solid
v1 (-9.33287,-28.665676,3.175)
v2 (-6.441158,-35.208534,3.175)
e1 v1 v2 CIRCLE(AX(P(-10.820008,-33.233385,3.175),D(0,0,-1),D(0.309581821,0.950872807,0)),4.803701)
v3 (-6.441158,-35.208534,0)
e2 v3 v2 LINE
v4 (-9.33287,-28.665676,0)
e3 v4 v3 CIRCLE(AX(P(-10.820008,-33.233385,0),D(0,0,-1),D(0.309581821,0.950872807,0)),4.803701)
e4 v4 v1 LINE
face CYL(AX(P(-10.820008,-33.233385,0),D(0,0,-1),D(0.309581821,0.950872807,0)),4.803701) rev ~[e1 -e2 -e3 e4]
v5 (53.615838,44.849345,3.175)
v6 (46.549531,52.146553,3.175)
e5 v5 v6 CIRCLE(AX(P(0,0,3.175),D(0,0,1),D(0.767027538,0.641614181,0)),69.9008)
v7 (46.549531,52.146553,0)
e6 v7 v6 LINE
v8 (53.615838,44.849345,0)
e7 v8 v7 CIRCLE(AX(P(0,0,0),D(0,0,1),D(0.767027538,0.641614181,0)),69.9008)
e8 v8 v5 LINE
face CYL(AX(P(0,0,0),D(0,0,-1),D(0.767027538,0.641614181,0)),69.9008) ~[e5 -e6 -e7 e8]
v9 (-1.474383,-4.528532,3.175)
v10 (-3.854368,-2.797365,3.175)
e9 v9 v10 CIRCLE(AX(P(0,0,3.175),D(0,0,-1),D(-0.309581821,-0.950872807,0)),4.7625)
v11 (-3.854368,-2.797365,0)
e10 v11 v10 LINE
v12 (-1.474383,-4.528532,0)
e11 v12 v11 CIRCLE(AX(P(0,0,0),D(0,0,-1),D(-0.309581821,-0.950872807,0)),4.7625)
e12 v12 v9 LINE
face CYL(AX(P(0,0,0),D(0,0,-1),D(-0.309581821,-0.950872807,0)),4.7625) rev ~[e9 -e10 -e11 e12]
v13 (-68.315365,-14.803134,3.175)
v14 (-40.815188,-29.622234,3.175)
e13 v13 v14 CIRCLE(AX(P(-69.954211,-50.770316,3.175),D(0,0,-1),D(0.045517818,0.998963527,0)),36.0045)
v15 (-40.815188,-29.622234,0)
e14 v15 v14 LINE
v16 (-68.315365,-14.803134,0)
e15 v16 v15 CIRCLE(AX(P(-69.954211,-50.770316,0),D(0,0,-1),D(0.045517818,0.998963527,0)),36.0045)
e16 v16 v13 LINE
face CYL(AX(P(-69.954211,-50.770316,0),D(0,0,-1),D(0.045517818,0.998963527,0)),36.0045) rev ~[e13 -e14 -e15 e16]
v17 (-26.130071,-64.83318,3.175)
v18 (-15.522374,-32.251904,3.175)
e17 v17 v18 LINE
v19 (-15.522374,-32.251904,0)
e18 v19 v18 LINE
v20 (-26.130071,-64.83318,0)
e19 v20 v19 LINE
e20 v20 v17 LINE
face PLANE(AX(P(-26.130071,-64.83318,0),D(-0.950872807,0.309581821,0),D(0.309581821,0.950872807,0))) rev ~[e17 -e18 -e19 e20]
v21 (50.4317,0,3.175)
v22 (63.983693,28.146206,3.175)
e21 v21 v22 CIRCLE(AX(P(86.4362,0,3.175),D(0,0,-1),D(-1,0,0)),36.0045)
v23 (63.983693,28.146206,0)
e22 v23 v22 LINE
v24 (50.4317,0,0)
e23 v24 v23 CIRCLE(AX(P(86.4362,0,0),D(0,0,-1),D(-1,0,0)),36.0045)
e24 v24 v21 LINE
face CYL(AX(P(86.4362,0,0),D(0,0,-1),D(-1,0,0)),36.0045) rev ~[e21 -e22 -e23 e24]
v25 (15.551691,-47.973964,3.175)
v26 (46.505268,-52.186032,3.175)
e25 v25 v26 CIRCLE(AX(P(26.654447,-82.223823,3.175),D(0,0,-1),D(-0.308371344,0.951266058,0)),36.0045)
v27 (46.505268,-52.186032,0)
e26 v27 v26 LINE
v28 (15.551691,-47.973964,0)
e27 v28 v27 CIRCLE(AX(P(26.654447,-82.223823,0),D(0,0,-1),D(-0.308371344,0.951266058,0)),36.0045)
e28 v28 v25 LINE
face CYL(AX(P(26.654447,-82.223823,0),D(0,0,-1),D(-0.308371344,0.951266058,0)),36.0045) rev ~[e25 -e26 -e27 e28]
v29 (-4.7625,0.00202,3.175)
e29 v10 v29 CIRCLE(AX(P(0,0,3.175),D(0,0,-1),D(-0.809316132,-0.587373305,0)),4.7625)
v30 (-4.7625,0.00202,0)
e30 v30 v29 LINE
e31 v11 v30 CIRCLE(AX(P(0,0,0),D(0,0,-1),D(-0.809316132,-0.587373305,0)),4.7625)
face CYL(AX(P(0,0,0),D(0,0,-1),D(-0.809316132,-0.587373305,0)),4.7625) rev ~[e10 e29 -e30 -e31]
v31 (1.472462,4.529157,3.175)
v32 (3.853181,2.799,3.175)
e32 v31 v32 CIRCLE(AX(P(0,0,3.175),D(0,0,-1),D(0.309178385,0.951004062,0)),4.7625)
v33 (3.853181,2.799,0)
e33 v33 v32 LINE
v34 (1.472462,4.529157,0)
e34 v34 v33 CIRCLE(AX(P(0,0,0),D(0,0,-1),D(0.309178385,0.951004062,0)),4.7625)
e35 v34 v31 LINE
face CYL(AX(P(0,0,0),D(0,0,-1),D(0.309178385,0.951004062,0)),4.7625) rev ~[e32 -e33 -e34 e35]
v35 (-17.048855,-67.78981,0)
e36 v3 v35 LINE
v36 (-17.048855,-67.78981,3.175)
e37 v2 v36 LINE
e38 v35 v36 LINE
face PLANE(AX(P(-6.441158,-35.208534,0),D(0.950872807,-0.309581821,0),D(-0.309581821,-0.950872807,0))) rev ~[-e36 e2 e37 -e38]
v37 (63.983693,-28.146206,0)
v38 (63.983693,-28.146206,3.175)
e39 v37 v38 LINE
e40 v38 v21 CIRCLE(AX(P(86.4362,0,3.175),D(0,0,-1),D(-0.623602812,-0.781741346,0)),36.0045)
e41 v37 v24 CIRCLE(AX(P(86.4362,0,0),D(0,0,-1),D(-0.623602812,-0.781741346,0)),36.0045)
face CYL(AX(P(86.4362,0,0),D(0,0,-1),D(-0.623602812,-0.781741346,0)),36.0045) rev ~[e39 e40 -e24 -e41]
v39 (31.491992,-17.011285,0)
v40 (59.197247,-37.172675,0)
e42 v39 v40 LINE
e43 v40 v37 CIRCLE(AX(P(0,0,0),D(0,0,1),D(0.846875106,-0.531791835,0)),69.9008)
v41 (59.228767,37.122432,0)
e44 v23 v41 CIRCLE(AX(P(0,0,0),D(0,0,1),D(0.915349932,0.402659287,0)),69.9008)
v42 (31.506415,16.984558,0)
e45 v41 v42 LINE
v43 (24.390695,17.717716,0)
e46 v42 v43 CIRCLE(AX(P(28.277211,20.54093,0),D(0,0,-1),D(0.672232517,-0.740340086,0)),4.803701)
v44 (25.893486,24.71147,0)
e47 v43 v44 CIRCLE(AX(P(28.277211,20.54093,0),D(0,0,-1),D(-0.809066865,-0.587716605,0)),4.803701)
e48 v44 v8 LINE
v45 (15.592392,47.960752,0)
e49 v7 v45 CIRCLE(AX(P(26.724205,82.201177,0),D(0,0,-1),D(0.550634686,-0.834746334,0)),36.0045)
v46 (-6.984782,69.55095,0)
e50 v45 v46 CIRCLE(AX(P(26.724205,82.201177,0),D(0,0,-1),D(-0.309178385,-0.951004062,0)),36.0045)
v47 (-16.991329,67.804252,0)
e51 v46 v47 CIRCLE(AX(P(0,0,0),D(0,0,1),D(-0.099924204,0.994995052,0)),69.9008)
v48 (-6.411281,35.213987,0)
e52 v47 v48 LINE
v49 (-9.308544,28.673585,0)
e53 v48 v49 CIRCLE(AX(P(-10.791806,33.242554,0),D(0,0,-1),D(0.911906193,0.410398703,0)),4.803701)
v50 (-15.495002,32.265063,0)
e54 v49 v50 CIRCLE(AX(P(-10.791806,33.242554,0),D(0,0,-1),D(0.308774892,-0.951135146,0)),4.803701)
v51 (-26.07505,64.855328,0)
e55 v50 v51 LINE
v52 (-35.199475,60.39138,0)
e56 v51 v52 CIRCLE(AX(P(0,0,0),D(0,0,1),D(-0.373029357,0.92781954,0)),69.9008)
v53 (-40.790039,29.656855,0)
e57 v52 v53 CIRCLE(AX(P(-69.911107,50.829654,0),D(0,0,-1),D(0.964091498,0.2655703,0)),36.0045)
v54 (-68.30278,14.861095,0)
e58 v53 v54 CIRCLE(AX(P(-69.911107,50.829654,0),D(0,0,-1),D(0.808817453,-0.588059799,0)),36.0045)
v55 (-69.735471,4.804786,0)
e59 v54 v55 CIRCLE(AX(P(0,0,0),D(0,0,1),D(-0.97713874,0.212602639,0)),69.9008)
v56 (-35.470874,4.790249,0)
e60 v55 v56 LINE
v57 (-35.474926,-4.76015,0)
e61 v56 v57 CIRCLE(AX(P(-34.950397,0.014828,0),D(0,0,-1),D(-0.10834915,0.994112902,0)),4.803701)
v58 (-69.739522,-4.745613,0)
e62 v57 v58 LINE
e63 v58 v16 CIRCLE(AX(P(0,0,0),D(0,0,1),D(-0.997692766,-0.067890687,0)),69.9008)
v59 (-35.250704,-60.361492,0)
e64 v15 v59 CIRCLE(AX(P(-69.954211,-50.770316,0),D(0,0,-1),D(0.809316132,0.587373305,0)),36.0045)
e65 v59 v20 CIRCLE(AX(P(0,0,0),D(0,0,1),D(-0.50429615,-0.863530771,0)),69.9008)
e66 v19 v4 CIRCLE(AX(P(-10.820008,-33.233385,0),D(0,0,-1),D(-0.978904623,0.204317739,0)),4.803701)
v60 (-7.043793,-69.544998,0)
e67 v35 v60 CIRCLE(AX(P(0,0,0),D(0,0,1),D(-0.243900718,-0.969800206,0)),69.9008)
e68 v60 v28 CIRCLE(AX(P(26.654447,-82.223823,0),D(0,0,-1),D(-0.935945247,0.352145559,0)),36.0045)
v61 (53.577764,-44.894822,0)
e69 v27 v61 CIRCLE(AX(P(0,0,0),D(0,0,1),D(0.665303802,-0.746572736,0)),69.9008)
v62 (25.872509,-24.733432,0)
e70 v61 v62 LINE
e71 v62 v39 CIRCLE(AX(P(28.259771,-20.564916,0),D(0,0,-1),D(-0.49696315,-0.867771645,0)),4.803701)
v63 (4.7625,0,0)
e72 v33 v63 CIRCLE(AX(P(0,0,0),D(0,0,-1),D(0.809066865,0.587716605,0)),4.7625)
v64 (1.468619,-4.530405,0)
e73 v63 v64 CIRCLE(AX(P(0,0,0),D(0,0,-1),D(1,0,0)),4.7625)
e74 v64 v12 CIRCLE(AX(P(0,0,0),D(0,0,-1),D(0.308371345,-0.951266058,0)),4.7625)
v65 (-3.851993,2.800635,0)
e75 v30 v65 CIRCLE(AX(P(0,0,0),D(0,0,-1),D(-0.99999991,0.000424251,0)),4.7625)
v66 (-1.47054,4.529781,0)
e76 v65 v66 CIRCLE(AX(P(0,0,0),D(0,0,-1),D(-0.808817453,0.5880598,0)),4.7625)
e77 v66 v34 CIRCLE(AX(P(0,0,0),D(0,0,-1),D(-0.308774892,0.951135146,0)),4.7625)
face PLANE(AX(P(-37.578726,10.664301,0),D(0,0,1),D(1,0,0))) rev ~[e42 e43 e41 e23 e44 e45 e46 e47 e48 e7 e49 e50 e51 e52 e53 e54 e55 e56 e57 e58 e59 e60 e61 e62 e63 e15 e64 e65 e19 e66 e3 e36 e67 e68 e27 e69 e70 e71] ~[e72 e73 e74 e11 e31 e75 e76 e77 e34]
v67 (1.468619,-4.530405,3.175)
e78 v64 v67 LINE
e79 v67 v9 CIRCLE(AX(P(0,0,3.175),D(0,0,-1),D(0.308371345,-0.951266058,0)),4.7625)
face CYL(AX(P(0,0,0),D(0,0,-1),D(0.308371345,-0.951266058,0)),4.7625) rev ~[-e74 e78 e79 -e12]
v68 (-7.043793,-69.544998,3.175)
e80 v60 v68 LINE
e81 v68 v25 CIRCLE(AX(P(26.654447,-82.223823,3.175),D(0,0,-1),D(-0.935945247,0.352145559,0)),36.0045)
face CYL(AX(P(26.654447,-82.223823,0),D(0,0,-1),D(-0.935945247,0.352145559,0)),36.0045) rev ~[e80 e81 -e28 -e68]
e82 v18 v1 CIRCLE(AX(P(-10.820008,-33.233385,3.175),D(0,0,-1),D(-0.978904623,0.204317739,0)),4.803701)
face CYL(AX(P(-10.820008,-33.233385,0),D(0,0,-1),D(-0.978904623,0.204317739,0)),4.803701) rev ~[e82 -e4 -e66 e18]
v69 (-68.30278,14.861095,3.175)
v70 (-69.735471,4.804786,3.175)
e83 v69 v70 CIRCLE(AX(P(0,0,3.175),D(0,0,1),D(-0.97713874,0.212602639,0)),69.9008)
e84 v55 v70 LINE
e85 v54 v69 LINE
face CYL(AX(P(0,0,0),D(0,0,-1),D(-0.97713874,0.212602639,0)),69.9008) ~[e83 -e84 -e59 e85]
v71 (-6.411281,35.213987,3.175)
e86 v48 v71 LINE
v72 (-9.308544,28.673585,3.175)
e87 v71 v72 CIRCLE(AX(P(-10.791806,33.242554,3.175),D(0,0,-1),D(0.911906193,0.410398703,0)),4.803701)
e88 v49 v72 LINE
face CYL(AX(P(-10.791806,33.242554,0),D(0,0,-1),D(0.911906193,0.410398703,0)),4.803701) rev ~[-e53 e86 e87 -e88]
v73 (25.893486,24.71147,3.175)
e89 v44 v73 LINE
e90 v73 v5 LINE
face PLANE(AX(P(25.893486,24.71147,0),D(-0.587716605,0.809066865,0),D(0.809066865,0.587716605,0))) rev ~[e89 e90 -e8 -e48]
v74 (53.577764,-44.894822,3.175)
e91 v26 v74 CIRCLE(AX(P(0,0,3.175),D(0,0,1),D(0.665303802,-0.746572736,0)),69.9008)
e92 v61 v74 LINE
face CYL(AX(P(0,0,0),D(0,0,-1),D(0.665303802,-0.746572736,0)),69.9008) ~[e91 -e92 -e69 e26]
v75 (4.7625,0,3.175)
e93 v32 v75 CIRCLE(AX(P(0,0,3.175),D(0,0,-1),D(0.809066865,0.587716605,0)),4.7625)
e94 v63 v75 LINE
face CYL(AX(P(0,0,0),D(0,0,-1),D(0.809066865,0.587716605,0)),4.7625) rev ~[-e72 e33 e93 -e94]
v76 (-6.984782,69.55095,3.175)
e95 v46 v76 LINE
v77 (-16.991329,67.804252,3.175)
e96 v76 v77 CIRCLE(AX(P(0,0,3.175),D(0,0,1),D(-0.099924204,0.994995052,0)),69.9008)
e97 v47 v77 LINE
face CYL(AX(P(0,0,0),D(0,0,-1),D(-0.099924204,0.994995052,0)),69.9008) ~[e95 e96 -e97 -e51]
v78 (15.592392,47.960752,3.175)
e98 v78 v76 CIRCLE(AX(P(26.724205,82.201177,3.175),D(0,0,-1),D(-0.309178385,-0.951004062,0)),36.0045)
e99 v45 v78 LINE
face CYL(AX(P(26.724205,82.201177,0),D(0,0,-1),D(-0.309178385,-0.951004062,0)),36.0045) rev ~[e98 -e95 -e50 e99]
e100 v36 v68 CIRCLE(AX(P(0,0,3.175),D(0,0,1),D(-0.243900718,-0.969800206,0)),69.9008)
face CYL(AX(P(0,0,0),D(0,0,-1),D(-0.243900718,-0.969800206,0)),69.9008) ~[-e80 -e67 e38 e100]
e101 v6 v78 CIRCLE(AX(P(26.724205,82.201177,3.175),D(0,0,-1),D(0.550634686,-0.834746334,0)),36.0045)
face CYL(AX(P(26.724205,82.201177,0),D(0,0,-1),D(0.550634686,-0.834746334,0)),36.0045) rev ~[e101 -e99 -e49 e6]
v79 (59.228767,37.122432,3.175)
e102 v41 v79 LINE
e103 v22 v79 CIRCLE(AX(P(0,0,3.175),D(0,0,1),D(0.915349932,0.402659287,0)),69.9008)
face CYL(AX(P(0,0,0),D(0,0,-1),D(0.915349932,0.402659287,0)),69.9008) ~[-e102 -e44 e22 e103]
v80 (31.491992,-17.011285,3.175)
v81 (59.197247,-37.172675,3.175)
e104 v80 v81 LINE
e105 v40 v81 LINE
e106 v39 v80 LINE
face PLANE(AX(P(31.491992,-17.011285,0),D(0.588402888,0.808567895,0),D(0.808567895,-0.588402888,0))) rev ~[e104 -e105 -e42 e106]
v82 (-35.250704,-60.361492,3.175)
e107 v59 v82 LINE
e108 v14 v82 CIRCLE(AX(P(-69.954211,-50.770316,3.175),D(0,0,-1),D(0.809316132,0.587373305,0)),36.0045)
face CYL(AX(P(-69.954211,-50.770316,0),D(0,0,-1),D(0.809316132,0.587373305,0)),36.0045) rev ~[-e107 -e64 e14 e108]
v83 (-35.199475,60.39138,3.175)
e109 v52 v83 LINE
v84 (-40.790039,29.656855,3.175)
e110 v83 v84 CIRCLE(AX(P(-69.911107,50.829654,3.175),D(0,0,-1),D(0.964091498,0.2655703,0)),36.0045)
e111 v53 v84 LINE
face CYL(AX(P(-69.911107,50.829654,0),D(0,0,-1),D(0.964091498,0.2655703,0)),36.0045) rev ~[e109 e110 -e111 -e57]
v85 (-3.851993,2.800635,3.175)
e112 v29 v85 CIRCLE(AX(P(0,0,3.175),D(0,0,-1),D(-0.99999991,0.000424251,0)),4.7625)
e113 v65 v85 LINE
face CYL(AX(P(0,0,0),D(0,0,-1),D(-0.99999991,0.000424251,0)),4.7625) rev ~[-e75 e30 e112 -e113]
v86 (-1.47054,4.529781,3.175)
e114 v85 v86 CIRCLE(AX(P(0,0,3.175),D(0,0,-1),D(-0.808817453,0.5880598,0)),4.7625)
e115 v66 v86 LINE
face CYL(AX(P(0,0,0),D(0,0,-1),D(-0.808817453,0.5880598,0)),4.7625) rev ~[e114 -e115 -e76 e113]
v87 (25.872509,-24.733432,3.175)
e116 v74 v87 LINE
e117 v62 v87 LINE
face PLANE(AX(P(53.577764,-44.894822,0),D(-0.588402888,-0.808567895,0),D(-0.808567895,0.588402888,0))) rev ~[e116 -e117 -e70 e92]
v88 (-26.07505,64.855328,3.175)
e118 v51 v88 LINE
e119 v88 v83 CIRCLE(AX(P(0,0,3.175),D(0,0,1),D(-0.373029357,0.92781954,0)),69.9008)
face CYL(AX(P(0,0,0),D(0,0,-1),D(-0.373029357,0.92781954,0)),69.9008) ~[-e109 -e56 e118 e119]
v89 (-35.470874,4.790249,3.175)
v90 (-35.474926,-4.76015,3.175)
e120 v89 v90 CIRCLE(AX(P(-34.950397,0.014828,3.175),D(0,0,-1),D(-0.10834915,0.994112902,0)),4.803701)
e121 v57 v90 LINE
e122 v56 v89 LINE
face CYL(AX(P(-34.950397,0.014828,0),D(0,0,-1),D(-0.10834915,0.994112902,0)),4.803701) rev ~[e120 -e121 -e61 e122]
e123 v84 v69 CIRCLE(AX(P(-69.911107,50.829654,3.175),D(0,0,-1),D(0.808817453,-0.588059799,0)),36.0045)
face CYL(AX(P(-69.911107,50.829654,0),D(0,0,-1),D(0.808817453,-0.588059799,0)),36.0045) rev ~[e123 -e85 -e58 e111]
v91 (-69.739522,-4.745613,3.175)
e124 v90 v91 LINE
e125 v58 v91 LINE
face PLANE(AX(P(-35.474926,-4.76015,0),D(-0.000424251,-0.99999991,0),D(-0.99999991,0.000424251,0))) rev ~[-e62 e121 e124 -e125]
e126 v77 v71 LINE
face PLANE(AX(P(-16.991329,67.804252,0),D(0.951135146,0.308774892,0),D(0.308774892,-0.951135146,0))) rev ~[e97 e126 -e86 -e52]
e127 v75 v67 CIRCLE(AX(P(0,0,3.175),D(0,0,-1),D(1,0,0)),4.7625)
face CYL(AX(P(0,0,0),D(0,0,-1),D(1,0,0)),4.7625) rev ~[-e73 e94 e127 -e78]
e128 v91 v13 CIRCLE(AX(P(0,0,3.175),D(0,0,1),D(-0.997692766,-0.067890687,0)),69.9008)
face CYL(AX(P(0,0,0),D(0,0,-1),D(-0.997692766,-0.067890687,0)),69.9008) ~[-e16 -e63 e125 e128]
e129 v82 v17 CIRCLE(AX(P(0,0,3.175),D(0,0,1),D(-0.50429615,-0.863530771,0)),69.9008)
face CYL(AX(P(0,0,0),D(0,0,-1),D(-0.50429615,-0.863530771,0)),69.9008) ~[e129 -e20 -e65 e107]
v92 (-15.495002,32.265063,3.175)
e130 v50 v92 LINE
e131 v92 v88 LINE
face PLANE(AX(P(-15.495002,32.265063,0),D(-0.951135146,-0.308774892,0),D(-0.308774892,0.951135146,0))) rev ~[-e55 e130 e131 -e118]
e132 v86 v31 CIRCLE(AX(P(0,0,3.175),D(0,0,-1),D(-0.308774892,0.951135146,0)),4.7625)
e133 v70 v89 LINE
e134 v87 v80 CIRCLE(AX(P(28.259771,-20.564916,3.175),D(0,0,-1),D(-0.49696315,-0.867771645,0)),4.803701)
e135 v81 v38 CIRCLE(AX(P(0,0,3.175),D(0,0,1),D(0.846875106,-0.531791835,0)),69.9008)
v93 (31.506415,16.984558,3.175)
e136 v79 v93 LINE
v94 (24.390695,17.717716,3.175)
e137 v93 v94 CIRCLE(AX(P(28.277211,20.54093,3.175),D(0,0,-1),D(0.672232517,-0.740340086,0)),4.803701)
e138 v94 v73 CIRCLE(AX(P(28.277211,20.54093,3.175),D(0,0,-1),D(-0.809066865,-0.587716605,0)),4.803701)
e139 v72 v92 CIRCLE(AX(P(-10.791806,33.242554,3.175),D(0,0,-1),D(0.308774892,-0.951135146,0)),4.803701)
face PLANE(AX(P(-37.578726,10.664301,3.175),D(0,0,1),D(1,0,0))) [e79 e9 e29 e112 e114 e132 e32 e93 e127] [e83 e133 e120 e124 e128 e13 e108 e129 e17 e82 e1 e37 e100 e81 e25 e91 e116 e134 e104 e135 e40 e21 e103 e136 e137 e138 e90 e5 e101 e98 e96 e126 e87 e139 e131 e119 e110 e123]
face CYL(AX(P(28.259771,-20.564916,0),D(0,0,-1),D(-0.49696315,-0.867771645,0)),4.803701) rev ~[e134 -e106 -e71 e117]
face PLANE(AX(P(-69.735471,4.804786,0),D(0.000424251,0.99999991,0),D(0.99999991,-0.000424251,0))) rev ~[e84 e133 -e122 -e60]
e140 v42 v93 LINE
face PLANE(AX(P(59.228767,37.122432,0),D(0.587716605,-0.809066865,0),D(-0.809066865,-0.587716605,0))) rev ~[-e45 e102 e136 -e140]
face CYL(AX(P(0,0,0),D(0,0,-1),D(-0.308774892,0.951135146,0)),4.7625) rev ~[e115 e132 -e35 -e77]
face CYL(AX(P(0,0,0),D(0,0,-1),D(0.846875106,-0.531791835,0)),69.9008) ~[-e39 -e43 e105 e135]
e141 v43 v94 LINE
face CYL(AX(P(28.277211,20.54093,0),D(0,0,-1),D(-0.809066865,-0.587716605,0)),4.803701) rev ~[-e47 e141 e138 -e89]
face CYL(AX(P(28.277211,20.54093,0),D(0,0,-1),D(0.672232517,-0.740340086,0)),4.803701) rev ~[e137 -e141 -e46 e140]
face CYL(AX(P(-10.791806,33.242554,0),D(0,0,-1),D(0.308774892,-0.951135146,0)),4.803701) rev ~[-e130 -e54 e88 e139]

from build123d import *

# Parameters (mm, degrees)
F1_DEPTH = 3.175


# Not quite as in the source:
# - a length typed as a fraction of an inch, garbled in the dataset ("3 / 203.2 mm" for 3/8 in), is restored


with BuildPart() as f1:
    # F0 (on Top) → F1 (new body)
    with BuildSketch(Plane.XY):
        with BuildLine():
            ThreePointArc((-4.7624995714, 0.0020204955), (-4.528844398, 1.4734227733), (-3.8519931198, 2.800634795))
            Line((-3.8519931198, 2.800634795), (-40.7900391434, 29.6568553891))
            ThreePointArc((-40.7900391434, 29.6568553891), (-52.8581727457, 19.1196962374), (-68.3027796686, 14.8610945149))
            ThreePointArc((-68.3027796686, 14.8610945149), (-69.202037382, 9.8589990779), (-69.7354707037, 4.8047857774))
            Line((-69.7354707037, 4.8047857774), (-35.4708737874, 4.7902489857))
            ThreePointArc((-35.4708737874, 4.7902489857), (-31.7421994573, 3.5901618172), (-30.1466961845, 0.012789768))
            Line((-30.1466961845, 0.012789768), (-4.7624995714, 0.0020204955))
        make_face()
        with BuildLine():
            ThreePointArc((-3.8519931198, 2.800634795), (-2.7981829099, 3.853774598), (-1.4705404248, 4.5297811326))
            Line((-1.4705404248, 4.5297811326), (-9.3085437064, 28.6735848558))
            ThreePointArc((-9.3085437064, 28.6735848558), (-13.2035838045, 29.0881739368), (-15.4950023114, 32.2650627762))
            Line((-15.4950023114, 32.2650627762), (-26.0750504874, 64.8553280982))
            ThreePointArc((-26.0750504874, 64.8553280982), (-30.7184565015, 62.789316534), (-35.1994748016, 60.3913802983))
            ThreePointArc((-35.1994748016, 60.3913802983), (-34.4878638746, 44.3862192082), (-40.7900391434, 29.6568553891))
            Line((-40.7900391434, 29.6568553891), (-3.8519931198, 2.800634795))
        make_face()
        with BuildLine():
            ThreePointArc((-1.4705404248, 4.5297811326), (0.0010102478, 4.7624998929), (1.4724620567, 4.5291568466))
            Line((1.4724620567, 4.5291568466), (15.5923915392, 47.9607515681))
            ThreePointArc((15.5923915392, 47.9607515681), (1.8403043285, 56.1797338033), (-6.9847818286, 69.5509501261))
            ThreePointArc((-6.9847818286, 69.5509501261), (-12.0198259563, 68.8596080777), (-16.9913293895, 67.8042518299))
            Line((-16.9913293895, 67.8042518299), (-6.4112812135, 35.213986508))
            ThreePointArc((-6.4112812135, 35.213986508), (-6.3997434798, 31.296961061), (-9.3085437064, 28.6735848558))
            Line((-9.3085437064, 28.6735848558), (-1.4705404248, 4.5297811326))
        make_face()
        with BuildLine():
            ThreePointArc((1.4724620567, 4.5291568466), (2.7998176259, 3.8525871193), (3.8531809453, 2.7990003309))
            Line((3.8531809453, 2.7990003309), (24.390695172, 17.7177155255))
            ThreePointArc((24.390695172, 17.7177155255), (23.5807088667, 21.5500964639), (25.893485986, 24.7114701318))
            Line((25.893485986, 24.7114701318), (53.6158384941, 44.8493445127))
            ThreePointArc((53.6158384941, 44.8493445127), (50.2154123333, 48.626476377), (46.5495312326, 52.1465529318))
            ThreePointArc((46.5495312326, 52.1465529318), (31.5485727352, 46.5213581982), (15.5923915392, 47.9607515681))
            Line((15.5923915392, 47.9607515681), (1.4724620567, 4.5291568466))
        make_face()
        with BuildLine():
            Line((24.390695172, 17.7177155255), (3.8531809453, 2.7990003309))
            ThreePointArc((3.8531809453, 2.7990003309), (4.5294690915, 1.4715012738), (4.7625, 0))
            Line((4.7625, 0), (50.4317, 0))
            ThreePointArc((50.4317, 0), (53.9961373847, 15.6194224529), (63.9836925433, 28.1462063014))
            ThreePointArc((63.9836925433, 28.1462063014), (61.7694966371, 32.7208057029), (59.2287671577, 37.1224323236))
            Line((59.2287671577, 37.1224323236), (31.5064146496, 16.9845579428))
            ThreePointArc((31.5064146496, 16.9845579428), (27.7848747553, 15.7625259109), (24.390695172, 17.7177155255))
        make_face()
        with BuildLine():
            Line((50.4317, 0), (4.7625, 0))
            ThreePointArc((4.7625, 0), (3.8519931198, -2.800634795), (1.4686185281, -4.5304046032))
            Line((1.4686185281, -4.5304046032), (15.5516911338, -47.9739644784))
            ThreePointArc((15.5516911338, -47.9739644784), (31.509087914, -46.5481104778), (46.5052680226, -52.1860315294))
            ThreePointArc((46.5052680226, -52.1860315294), (50.1741345955, -48.6690667492), (53.5777644361, -44.8948215128))
            Line((53.5777644361, -44.8948215128), (25.8725089337, -24.7334319103))
            ThreePointArc((25.8725089337, -24.7334319103), (24.3756528753, -17.7384047006), (31.491991877, -17.0112850838))
            Line((31.491991877, -17.0112850838), (59.1972473794, -37.1726746864))
            ThreePointArc((59.1972473794, -37.1726746864), (61.7556092427, -32.7470085305), (63.9836925433, -28.1462063014))
            ThreePointArc((63.9836925433, -28.1462063014), (53.9961373847, -15.6194224529), (50.4317, 0))
        make_face()
        with BuildLine():
            ThreePointArc((1.4686185281, -4.5304046032), (-0.0030307432, -4.7624990357), (-1.4743834236, -4.5285317455))
            Line((-1.4743834236, -4.5285317455), (-9.3328699489, -28.6656762162))
            ThreePointArc((-9.3328699489, -28.6656762162), (-6.4262967093, -31.2915195998), (-6.4411580428, -35.208533847))
            Line((-6.4411580428, -35.208533847), (-17.0488553147, -67.7898102453))
            ThreePointArc((-17.0488553147, -67.7898102453), (-12.078249143, -68.8493844437), (-7.0437934329, -69.5449984881))
            ThreePointArc((-7.0437934329, -69.5449984881), (1.7926350508, -56.1812750817), (15.5516911338, -47.9739644784))
            Line((15.5516911338, -47.9739644784), (1.4686185281, -4.5304046032))
        make_face()
        with BuildLine():
            ThreePointArc((-1.4743834236, -4.5285317455), (-2.801451838, -3.851398947), (-3.8543680773, -2.797365363))
            Line((-3.8543680773, -2.797365363), (-40.8151883603, -29.6222342844))
            ThreePointArc((-40.8151883603, -29.6222342844), (-34.5255132545, -44.3569402094), (-35.2507043361, -60.3614917348))
            ThreePointArc((-35.2507043361, -60.3614917348), (-30.7717223028, -62.7632292601), (-26.130070975, -64.8331800198))
            Line((-26.130070975, -64.8331800198), (-15.5223737031, -32.2519036214))
            ThreePointArc((-15.5223737031, -32.2519036214), (-13.2282604246, -29.0769601987), (-9.3328699489, -28.6656762162))
            Line((-9.3328699489, -28.6656762162), (-1.4743834236, -4.5285317455))
        make_face()
        with BuildLine():
            ThreePointArc((-3.8543680773, -2.797365363), (-4.5300929698, -1.4695795095), (-4.7624995714, 0.0020204955))
            Line((-4.7624995714, 0.0020204955), (-30.1466961845, 0.012789768))
            ThreePointArc((-30.1466961845, 0.012789768), (-31.7452342902, -3.5632272058), (-35.4749255544, -4.7601501548))
            Line((-35.4749255544, -4.7601501548), (-69.7395224707, -4.7456133631))
            ThreePointArc((-69.7395224707, -4.7456133631), (-69.210377851, -9.8002774634), (-68.3153647492, -14.8031341217))
            ThreePointArc((-68.3153647492, -14.8031341217), (-52.874376818, -19.0748390906), (-40.8151883603, -29.6222342844))
            Line((-40.8151883603, -29.6222342844), (-3.8543680773, -2.797365363))
        make_face()
    extrude(amount=F1_DEPTH)


solid = f1.part
